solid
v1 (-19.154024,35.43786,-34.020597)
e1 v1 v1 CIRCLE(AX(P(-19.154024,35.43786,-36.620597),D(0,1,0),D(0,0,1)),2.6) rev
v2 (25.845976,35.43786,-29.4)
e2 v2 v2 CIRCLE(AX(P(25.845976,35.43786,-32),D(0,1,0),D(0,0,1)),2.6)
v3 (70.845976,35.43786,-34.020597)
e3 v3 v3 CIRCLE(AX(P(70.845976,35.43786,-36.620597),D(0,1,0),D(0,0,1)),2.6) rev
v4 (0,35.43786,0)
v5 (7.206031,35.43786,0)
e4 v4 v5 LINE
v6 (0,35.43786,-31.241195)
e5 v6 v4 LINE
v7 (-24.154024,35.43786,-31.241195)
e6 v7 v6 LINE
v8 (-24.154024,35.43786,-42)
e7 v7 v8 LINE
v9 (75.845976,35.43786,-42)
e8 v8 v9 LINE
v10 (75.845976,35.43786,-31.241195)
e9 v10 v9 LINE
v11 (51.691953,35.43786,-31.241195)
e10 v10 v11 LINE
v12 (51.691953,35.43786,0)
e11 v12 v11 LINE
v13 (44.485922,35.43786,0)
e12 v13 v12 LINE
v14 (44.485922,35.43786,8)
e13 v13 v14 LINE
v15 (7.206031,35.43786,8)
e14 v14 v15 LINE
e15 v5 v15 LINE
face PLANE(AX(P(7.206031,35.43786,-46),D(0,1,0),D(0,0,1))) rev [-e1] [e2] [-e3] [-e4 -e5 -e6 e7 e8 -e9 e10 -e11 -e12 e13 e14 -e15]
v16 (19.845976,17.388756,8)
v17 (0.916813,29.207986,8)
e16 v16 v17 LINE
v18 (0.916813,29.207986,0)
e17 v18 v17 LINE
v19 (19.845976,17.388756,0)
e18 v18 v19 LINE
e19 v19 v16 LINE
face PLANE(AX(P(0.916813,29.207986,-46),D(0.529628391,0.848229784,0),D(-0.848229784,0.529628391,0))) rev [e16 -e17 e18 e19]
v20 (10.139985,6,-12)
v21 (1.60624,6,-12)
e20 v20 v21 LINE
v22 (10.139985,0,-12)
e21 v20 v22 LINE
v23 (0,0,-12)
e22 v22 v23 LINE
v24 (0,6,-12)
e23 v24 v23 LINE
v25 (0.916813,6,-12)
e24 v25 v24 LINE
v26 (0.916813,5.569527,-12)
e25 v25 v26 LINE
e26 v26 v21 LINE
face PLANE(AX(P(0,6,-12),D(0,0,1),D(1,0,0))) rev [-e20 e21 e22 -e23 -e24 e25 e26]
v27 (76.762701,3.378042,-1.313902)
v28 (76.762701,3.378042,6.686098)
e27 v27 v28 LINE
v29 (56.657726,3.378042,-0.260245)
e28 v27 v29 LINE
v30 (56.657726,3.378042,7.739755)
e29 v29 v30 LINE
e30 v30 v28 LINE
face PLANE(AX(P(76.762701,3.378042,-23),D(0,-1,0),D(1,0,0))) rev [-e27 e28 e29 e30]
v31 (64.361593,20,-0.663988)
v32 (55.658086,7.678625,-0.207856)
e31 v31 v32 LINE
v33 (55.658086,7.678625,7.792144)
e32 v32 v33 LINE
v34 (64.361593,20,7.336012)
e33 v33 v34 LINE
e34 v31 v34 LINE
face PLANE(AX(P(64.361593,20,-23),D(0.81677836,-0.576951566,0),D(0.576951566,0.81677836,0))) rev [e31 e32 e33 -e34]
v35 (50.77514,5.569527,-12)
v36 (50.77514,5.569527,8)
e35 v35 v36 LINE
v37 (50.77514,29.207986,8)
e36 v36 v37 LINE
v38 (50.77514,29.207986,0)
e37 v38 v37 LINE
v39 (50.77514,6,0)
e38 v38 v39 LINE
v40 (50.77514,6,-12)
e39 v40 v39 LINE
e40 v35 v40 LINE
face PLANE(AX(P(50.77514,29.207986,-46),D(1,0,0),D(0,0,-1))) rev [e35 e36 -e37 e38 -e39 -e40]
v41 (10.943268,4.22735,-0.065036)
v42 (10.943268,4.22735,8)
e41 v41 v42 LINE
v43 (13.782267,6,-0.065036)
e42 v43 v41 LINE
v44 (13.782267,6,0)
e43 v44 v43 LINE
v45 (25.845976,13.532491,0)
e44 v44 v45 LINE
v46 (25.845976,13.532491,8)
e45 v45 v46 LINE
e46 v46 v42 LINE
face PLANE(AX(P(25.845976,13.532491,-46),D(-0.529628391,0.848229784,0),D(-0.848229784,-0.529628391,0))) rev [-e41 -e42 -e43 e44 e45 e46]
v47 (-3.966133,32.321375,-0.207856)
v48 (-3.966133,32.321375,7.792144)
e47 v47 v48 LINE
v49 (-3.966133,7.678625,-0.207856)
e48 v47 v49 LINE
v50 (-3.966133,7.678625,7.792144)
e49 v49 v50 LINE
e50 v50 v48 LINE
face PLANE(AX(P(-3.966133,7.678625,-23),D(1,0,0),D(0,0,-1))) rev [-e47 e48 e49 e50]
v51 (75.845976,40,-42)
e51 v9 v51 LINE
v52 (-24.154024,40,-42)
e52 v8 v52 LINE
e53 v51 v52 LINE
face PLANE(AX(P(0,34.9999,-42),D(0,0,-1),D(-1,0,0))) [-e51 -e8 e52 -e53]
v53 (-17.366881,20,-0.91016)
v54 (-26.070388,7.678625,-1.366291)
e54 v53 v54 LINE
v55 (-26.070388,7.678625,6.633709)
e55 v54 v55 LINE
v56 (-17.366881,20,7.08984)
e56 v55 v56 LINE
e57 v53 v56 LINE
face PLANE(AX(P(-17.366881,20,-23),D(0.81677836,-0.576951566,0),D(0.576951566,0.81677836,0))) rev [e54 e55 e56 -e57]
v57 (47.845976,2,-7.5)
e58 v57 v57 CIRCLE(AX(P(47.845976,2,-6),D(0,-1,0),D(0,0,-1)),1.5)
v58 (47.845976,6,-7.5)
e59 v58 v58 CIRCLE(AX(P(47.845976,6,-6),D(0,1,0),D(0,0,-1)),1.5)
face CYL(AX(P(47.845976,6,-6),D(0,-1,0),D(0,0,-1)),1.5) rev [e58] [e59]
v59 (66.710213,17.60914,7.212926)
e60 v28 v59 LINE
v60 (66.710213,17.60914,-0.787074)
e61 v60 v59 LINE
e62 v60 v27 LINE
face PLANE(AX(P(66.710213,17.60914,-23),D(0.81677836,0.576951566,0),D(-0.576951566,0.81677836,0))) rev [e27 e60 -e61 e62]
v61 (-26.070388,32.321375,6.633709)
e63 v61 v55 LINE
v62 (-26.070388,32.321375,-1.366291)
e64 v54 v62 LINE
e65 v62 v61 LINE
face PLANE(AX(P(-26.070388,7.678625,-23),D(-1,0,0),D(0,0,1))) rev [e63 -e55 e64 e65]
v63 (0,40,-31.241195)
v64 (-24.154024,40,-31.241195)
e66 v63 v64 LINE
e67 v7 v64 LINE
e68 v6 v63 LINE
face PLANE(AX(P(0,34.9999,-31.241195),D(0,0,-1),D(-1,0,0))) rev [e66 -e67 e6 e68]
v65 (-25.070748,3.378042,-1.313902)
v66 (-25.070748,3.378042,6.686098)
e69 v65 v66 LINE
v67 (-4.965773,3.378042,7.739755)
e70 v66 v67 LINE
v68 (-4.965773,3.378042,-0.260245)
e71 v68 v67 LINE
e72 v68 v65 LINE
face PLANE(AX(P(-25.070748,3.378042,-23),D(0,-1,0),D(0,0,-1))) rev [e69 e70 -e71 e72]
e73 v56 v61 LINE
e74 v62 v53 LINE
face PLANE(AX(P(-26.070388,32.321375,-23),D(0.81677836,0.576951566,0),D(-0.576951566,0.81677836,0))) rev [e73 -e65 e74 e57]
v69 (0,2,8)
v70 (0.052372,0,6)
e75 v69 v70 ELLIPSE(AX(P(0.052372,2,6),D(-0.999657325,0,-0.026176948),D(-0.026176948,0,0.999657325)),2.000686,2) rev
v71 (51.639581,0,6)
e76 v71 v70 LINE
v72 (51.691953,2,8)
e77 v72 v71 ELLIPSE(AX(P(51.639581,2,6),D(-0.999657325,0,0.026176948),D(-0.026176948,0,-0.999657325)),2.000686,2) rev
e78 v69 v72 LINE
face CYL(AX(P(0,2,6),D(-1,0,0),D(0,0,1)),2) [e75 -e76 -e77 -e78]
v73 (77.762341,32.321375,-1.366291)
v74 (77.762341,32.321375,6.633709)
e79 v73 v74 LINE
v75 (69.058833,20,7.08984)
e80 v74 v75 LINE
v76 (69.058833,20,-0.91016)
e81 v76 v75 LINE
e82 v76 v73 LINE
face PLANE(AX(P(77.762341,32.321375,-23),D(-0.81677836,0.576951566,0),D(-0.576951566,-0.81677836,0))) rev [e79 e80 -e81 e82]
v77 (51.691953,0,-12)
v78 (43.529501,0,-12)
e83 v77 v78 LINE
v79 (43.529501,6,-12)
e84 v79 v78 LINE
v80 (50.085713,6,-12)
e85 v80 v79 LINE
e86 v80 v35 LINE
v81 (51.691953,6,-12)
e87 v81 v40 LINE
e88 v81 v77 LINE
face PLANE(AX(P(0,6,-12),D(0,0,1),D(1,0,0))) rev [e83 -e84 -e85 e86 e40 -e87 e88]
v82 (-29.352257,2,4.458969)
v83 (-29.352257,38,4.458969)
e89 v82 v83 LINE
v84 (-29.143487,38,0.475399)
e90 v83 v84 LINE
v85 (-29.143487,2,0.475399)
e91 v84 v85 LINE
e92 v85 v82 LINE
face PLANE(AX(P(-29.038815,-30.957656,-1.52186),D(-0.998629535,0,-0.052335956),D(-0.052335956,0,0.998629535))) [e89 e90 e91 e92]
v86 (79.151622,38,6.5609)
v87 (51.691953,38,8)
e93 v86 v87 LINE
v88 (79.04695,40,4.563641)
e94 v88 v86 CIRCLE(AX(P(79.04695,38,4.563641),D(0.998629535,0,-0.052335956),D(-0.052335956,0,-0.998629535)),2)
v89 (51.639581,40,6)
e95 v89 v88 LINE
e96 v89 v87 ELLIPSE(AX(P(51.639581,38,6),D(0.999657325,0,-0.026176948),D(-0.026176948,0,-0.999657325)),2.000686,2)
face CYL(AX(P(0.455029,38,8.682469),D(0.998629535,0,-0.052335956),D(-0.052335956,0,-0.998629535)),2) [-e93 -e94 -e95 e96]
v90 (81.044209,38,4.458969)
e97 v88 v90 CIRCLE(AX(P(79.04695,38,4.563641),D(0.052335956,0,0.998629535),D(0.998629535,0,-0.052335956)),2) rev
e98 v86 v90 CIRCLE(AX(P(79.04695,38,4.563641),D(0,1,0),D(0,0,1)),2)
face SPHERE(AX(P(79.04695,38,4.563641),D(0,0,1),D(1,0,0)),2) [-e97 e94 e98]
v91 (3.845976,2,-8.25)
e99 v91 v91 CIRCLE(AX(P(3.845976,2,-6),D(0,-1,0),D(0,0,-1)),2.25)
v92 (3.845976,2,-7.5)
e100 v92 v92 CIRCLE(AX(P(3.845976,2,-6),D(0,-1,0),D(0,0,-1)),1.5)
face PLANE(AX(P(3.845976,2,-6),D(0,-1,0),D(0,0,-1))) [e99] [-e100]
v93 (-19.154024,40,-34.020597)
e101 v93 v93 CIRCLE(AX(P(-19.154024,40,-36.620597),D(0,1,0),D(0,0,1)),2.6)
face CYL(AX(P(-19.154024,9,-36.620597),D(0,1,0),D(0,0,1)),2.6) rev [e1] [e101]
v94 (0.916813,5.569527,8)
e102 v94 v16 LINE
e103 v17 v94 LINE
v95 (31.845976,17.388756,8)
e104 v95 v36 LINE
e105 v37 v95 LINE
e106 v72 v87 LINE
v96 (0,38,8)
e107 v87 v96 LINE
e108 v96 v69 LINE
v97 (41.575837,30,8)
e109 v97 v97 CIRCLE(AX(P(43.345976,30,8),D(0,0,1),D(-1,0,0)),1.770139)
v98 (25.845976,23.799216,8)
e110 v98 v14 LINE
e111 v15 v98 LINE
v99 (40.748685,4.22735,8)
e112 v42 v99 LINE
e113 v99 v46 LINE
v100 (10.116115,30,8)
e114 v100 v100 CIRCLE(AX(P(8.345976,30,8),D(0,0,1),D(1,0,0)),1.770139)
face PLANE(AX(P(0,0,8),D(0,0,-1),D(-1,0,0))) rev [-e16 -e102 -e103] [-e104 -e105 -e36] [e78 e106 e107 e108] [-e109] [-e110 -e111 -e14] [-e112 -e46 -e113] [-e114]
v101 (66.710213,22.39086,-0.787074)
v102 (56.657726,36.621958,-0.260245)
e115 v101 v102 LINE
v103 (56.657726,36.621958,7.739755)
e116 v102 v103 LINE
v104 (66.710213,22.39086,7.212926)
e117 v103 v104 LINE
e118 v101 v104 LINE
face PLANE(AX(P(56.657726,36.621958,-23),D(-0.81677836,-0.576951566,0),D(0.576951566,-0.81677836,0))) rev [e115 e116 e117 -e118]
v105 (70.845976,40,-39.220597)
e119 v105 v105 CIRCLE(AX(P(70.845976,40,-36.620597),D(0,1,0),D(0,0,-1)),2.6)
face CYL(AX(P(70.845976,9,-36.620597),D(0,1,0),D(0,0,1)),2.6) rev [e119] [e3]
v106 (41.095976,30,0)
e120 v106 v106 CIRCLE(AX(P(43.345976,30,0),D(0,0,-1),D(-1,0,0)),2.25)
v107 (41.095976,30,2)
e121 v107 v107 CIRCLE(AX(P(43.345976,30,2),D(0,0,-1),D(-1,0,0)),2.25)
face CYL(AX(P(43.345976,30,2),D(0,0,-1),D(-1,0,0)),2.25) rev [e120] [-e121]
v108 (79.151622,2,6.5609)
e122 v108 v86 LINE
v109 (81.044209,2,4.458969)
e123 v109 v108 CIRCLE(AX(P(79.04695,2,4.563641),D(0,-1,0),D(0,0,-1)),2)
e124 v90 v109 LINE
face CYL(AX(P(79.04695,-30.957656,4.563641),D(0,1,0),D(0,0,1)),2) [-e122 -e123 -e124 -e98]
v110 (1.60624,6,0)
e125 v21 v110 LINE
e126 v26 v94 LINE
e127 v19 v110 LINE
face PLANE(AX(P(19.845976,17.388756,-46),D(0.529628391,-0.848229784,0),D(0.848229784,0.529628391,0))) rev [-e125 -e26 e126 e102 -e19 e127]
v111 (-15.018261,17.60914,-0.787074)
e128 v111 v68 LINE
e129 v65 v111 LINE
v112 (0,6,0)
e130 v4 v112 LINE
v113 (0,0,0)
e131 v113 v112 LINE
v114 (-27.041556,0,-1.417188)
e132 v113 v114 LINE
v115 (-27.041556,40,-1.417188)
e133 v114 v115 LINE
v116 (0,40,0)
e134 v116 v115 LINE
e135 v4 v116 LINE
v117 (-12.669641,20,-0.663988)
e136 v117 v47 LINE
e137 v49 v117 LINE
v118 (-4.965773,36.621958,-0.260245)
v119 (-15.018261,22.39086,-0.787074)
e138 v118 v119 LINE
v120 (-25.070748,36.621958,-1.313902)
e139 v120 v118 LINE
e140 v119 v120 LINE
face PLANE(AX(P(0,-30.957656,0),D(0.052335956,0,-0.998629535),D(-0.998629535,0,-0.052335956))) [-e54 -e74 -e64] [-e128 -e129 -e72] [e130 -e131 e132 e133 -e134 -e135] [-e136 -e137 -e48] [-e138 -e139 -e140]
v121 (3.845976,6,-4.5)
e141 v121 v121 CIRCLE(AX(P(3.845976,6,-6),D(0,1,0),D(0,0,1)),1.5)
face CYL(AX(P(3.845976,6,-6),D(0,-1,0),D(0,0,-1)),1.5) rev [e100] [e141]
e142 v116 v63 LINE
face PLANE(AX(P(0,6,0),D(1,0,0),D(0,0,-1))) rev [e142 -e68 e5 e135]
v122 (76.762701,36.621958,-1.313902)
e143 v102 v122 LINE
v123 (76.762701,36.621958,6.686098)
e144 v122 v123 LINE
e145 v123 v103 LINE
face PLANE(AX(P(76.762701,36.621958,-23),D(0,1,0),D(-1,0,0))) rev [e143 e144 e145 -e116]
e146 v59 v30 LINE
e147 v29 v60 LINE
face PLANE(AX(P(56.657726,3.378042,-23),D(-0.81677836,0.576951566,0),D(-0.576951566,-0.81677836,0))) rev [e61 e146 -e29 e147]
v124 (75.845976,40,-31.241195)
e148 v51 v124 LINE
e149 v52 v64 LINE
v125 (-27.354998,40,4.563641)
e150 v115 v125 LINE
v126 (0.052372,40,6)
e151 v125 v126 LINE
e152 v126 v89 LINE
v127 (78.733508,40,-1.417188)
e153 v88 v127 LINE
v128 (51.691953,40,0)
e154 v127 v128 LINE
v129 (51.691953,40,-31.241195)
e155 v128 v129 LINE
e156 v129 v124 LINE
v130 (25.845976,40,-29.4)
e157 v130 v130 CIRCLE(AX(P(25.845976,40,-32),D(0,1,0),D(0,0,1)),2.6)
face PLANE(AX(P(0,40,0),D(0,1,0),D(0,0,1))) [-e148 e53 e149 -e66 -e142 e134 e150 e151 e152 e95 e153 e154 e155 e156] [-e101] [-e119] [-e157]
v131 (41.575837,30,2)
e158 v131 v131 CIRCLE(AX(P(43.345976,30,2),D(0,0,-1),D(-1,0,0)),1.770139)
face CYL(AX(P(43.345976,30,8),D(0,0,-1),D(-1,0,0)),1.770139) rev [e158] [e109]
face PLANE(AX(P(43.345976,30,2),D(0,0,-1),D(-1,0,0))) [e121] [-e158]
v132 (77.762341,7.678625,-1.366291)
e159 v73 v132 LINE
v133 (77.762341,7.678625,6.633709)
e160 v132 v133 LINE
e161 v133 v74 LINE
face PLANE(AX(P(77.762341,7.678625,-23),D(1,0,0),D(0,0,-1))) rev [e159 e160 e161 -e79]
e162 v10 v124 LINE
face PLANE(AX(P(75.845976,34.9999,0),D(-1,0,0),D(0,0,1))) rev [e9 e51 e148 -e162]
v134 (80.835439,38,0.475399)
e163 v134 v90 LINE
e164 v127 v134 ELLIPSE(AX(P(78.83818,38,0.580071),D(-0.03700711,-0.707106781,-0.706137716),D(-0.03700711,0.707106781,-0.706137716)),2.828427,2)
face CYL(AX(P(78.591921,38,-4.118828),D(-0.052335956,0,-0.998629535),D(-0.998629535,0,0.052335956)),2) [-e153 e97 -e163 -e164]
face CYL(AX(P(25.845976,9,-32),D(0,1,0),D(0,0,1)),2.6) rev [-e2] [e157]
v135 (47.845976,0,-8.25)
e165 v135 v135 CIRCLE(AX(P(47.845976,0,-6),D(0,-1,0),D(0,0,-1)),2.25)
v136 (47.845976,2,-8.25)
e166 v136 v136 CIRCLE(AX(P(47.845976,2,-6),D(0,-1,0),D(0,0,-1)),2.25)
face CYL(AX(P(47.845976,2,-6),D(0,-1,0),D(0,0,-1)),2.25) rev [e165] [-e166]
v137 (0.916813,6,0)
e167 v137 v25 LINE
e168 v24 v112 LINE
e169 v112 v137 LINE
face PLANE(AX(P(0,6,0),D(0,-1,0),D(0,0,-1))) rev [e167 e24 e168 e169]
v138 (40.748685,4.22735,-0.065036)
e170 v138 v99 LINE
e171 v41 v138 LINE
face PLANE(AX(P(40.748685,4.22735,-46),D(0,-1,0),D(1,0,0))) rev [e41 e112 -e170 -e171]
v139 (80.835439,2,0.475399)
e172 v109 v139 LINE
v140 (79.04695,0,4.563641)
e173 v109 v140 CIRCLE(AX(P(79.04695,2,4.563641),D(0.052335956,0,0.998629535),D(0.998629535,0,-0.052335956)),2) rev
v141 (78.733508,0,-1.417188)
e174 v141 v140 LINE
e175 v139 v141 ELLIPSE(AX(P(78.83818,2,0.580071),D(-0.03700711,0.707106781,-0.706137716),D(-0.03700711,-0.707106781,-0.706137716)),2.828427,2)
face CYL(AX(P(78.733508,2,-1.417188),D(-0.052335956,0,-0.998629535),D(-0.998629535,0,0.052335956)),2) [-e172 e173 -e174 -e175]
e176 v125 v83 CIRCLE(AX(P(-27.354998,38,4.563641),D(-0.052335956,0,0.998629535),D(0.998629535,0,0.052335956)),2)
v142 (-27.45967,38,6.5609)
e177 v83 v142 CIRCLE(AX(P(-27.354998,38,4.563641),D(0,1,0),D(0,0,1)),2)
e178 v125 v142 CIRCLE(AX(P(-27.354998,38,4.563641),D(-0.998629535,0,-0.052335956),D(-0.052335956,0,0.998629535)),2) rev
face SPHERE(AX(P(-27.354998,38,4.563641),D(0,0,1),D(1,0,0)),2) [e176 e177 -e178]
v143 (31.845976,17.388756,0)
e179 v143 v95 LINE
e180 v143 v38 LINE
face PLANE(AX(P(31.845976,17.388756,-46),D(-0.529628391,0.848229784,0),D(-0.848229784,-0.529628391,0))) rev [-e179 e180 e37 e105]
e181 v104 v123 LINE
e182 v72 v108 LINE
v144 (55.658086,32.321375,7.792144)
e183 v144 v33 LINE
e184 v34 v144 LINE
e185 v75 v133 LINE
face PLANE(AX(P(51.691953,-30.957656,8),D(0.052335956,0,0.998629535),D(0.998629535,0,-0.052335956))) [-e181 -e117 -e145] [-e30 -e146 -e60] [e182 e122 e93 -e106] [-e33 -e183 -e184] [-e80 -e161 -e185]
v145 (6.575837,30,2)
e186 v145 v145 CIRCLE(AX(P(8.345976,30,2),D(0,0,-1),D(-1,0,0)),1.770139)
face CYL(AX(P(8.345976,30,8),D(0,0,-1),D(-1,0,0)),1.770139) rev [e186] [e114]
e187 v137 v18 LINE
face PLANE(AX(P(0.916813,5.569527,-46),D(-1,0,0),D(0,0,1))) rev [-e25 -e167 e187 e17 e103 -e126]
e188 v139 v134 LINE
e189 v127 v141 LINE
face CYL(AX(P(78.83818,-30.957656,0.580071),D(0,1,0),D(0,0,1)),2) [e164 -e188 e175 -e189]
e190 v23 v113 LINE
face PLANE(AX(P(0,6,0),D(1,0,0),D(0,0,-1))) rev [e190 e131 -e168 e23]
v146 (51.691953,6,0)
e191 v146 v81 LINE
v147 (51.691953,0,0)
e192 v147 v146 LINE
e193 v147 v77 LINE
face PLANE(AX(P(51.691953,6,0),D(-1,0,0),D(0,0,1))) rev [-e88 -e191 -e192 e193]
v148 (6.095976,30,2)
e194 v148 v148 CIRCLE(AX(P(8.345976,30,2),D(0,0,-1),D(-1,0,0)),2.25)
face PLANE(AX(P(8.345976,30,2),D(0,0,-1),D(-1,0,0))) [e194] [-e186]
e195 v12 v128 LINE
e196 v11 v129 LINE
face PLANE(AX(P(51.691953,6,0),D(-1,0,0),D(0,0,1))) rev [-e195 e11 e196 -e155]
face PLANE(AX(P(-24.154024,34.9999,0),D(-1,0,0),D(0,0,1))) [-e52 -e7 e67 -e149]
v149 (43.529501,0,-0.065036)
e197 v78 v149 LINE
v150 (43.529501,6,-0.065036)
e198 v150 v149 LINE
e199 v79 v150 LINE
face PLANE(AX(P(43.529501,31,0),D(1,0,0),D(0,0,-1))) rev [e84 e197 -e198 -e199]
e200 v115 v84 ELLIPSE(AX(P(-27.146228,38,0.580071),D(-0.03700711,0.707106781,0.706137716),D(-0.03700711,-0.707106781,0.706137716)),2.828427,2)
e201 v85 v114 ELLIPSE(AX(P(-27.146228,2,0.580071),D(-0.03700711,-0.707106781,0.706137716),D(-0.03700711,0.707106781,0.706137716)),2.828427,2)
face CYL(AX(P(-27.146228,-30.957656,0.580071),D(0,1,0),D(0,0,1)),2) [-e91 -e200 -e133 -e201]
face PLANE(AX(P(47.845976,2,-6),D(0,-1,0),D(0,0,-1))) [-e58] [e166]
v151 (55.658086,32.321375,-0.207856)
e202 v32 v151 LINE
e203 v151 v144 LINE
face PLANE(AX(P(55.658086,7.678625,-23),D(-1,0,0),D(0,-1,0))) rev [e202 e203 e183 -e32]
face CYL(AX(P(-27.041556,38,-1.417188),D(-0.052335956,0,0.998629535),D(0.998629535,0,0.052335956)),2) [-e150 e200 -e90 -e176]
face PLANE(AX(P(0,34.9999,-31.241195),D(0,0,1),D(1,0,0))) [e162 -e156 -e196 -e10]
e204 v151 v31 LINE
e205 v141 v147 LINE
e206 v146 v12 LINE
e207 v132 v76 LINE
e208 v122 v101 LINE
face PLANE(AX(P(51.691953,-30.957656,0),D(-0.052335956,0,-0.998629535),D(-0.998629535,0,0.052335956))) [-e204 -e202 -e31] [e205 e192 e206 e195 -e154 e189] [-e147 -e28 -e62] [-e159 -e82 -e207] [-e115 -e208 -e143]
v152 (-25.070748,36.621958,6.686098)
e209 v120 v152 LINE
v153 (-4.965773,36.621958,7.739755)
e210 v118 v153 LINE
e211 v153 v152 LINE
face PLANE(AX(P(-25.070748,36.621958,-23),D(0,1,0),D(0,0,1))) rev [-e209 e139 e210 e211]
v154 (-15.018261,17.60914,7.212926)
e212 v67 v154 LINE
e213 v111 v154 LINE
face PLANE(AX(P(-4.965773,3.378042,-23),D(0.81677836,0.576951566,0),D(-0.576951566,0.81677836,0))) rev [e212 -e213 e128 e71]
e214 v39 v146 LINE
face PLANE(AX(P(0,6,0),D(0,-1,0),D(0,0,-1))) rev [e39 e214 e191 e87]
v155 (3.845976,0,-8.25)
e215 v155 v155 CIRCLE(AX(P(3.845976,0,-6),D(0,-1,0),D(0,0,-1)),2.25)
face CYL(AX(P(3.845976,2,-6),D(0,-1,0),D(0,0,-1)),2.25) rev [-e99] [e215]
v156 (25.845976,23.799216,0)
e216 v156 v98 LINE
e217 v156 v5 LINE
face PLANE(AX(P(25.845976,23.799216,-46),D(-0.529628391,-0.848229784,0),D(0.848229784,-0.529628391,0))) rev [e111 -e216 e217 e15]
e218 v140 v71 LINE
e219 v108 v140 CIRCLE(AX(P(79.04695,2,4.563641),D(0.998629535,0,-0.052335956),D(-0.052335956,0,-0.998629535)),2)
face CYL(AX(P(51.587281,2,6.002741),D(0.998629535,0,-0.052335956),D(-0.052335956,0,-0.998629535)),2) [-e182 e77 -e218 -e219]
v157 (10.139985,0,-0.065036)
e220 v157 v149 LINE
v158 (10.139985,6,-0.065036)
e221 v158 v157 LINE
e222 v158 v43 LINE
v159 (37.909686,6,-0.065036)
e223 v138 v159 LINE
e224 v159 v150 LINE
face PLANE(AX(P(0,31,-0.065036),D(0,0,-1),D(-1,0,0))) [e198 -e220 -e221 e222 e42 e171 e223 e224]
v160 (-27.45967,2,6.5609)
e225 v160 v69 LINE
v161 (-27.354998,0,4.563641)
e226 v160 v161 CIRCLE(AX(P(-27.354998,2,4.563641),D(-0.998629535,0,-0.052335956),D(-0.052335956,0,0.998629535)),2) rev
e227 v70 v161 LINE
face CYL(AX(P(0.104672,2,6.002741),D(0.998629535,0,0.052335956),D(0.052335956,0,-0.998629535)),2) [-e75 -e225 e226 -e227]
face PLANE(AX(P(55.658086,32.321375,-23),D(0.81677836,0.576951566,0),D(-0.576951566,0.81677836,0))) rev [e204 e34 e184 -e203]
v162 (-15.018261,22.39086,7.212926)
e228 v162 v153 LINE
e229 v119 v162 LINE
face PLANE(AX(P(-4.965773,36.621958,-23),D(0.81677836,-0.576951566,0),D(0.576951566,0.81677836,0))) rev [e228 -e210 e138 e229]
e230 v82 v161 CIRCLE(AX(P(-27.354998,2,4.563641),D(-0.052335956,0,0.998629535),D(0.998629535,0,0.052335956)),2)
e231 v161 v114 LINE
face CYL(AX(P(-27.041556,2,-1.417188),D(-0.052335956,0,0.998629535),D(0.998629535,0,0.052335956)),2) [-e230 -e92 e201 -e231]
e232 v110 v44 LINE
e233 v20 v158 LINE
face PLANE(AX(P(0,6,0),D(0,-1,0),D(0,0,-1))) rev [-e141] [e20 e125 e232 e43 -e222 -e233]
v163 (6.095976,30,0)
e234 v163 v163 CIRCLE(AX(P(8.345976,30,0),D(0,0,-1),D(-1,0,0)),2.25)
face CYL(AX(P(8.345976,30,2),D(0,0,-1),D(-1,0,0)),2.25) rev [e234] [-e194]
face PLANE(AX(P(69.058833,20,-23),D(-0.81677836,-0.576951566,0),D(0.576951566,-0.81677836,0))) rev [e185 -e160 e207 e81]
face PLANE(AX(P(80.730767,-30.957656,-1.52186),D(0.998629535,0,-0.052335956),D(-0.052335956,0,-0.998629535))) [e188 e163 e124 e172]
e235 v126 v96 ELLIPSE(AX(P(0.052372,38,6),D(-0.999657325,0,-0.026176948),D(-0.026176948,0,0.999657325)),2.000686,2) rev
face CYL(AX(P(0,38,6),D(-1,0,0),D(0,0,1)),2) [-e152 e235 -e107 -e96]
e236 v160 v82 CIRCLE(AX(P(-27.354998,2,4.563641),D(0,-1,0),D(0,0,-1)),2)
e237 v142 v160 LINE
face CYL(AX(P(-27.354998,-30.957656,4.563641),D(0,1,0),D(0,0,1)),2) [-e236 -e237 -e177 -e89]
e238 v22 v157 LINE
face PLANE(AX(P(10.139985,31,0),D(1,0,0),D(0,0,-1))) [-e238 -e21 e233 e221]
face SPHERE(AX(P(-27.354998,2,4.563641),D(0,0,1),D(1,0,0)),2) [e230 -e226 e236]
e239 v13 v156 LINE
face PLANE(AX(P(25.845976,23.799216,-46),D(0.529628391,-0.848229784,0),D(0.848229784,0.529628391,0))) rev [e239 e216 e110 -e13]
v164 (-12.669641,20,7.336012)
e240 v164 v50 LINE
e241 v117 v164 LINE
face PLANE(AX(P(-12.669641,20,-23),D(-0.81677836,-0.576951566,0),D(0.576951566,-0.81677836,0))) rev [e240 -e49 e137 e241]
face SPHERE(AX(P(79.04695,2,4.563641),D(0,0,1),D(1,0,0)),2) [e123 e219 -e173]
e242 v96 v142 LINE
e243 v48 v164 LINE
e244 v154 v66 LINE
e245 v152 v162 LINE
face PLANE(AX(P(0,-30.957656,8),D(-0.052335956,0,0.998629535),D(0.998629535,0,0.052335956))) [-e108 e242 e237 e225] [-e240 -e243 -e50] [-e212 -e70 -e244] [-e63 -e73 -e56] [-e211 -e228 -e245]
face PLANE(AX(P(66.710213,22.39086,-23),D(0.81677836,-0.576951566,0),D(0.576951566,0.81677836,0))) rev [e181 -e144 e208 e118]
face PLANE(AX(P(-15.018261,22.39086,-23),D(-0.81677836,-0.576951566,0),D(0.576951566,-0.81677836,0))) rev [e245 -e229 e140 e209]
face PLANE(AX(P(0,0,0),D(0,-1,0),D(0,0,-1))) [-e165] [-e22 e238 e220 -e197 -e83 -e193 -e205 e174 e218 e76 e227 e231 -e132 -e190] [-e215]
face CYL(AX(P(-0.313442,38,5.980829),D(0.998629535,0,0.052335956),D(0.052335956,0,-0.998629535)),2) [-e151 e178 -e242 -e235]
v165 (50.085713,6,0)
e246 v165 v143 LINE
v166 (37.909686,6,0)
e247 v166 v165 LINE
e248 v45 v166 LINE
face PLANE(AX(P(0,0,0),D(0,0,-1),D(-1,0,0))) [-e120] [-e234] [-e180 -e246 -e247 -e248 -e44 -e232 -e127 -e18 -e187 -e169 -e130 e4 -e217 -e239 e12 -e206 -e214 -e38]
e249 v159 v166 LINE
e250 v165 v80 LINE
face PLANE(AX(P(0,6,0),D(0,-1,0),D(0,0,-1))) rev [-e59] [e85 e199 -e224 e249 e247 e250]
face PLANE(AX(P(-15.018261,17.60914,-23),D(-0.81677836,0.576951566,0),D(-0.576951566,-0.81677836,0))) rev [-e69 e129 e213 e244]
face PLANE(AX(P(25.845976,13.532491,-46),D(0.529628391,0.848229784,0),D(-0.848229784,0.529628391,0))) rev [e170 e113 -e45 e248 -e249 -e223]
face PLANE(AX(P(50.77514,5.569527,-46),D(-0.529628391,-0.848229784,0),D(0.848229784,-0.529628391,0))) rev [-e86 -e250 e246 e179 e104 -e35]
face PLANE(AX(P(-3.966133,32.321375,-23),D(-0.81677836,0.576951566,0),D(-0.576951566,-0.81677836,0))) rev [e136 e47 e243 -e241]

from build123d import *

# Parameters (mm, degrees)
SKETCH1_W                = 51.691952551
SKETCH1_H                = 12
SKETCH1_R                = 1.5
BOSS_EXTRUDE1_DEPTH      = 6
SKETCH2_W                = 51.691952551
SKETCH2_H                = 35
SKETCH2_R                = 1.770138793
BOSS_EXTRUDE2_DEPTH      = 8
SKETCH3_R                = 2.25
CUT_EXTRUDE1_DEPTH       = 2
SKETCH4_R                = 2.25
CUT_EXTRUDE2_DEPTH       = 2
BOSS_EXTRUDE3_DEPTH      = 5
BOSS_EXTRUDE3_DEPTH_BACK = 0.0001
SKETCH5_W                = 24.154023724
SKETCH5_H                = 10.75880516
SKETCH5_W_2              = 24.154023725
CUT_EXTRUDE5_DEPTH       = 54
SKETCH15_W               = 33.389515724
SKETCH15_H               = 11.934964058
SKETCH15_W_2             = 15.051094337
SKETCH15_H_2             = 8.223566484
CUT_EXTRUDE6_DEPTH       = 31
BOSS_EXTRUDE6_REACH      = 97.481
CUT_EXTRUDE8_DEPTH       = 31
FILLET1_R                = 2
SKETCH23_R               = 2.6
CUT_EXTRUDE9_DEPTH       = 31
SKETCH25_W               = 109.4362768
SKETCH25_H               = 39.504770738
SKETCH25_W_2             = 51.691952551
SKETCH25_H_2             = 2.495229262
CUT_EXTRUDE10_DEPTH      = 0.437959608


with BuildPart() as part:
    # Sketch1 → Boss-Extrude1 (new body)
    with BuildSketch(Plane(origin=(0, 0, 0), x_dir=(1, 0, 0), z_dir=(0, 1, 0))):
        with Locations((25.845976275, 6)):
            Rectangle(SKETCH1_W, SKETCH1_H)
        with Locations(Location((3.845976276, 6, 0), (0, 0, 270))):
            Circle(SKETCH1_R, mode=Mode.SUBTRACT)
        with Locations(Location((47.845976276, 6, 0), (0, 0, 90))):
            Circle(SKETCH1_R, mode=Mode.SUBTRACT)
    extrude(amount=BOSS_EXTRUDE1_DEPTH)

    # Sketch2 → Boss-Extrude2 (add)
    with BuildSketch(Plane.XY):
        with Locations((25.845976275, 17.5)):
            Rectangle(SKETCH2_W, SKETCH2_H)
        with Locations((8.345976276, 30)):
            Circle(SKETCH2_R, mode=Mode.SUBTRACT)
        with Locations(Location((43.345976276, 30, 0), (0, 0, 180))):
            Circle(SKETCH2_R, mode=Mode.SUBTRACT)
    extrude(amount=BOSS_EXTRUDE2_DEPTH)

    # Sketch3 → Cut-Extrude1 (cut)
    with BuildSketch(Plane.XZ):
        with Locations(Location((47.845976276, -6, 0), (0, 0, 270))):
            Circle(SKETCH3_R)
        with Locations(Location((3.845976276, -6, 0), (0, 0, 270))):
            Circle(SKETCH3_R)
    extrude(amount=-CUT_EXTRUDE1_DEPTH, mode=Mode.SUBTRACT)

    # Sketch4 → Cut-Extrude2 (cut)
    with BuildSketch(Plane(origin=(0, 0, 0), x_dir=(-1, 0, 0), z_dir=(0, 0, -1))):
        with Locations((-43.345976276, 30)):
            Circle(SKETCH4_R)
        with Locations((-8.345976276, 30)):
            Circle(SKETCH4_R)
    extrude(amount=-CUT_EXTRUDE2_DEPTH, mode=Mode.SUBTRACT)

    # Sketch5 → Boss-Extrude3 (add, two sides: drawn at the far end of the back side and taken through both)
    # profile 1 of 3: a face of its own
    with BuildSketch(Plane(origin=(0, 35, 0), x_dir=(1, 0, 0), z_dir=(0, 1, 0)).offset(-BOSS_EXTRUDE3_DEPTH_BACK)):
        Polygon((0, -8), (25.845976276, -8), (51.691952551, -8), (51.691952551, 31.24119484), (51.691952551, 42), (0, 42), (0, 31.24119484), align=None)
        with BuildLine():
            ThreePointArc((28.345976276, 32), (27.613743229, 30.232233047), (25.845976276, 29.5))
            ThreePointArc((25.845976276, 29.5), (24.078209323, 33.767766953), (28.345976276, 32))
        make_face(mode=Mode.SUBTRACT)
    # profile 2 of 3: a face of its own
    with BuildSketch(Plane(origin=(0, 35, 0), x_dir=(1, 0, 0), z_dir=(0, 1, 0)).offset(-BOSS_EXTRUDE3_DEPTH_BACK)):
        with Locations((-12.077011862, 36.62059742)):
            Rectangle(SKETCH5_W, SKETCH5_H)
    # profile 3 of 3: a face of its own
    with BuildSketch(Plane(origin=(0, 35, 0), x_dir=(1, 0, 0), z_dir=(0, 1, 0)).offset(-BOSS_EXTRUDE3_DEPTH_BACK)):
        with Locations((63.768964414, 36.62059742)):
            Rectangle(SKETCH5_W_2, SKETCH5_H)
    extrude(amount=BOSS_EXTRUDE3_DEPTH + BOSS_EXTRUDE3_DEPTH_BACK)

    # Sketch14 → Cut-Extrude5 (cut)
    with BuildSketch(Plane.XY.offset(8)):
        Polygon((50.775139706, 29.207985595), (50.775139706, 5.569526874), (31.845976276, 17.388756234), align=None)
        Polygon((19.845976276, 17.388756234), (0.916812846, 5.569526874), (0.916812846, 29.207985595), align=None)
        Polygon((25.845976276, 23.799215747), (44.485921829, 35.437859608), (7.206030723, 35.437859608), align=None)
        Polygon((25.845976276, 13.532490719), (10.943267581, 4.227349855), (40.74868497, 4.227349855), align=None)
    extrude(amount=-CUT_EXTRUDE5_DEPTH, mode=Mode.SUBTRACT)

    # Sketch15 → Cut-Extrude6 (cut)
    with BuildSketch(Plane.XZ):
        with Locations((26.834743107, -6.032517971)):
            Rectangle(SKETCH15_W, SKETCH15_H)
        with Locations((26.283455375, -16.111783242)):
            Rectangle(SKETCH15_W_2, SKETCH15_H_2)
    extrude(amount=-CUT_EXTRUDE6_DEPTH, mode=Mode.SUBTRACT)

    # Boss-Extrude6: up to this face of the body (flat: up to its plane)
    boss_extrude6_end = Plane(part.part.faces().sort_by_distance((25.193104525, 0, 0.873444785))[0])
    # Sketch20 → Boss-Extrude6 (add, up to the picked face)
    with BuildSketch(Plane(origin=(0, 40, 0), x_dir=(1, 0, 0), z_dir=(0, 1, 0)), mode=Mode.PRIVATE) as boss_extrude6_sk1:
        Polygon((0, -8), (-29.456928706, -6.456227782), (-29.038814853, 1.521859799), (0, 0), align=None)
    boss_extrude6_tool1 = split(extrude(boss_extrude6_sk1.sketch, amount=-BOSS_EXTRUDE6_REACH, mode=Mode.PRIVATE), bisect_by=boss_extrude6_end, keep=Keep.BOTH, mode=Mode.PRIVATE)
    # Sketch20 → Boss-Extrude6 (add, up to the picked face)
    with BuildSketch(Plane(origin=(0, 40, 0), x_dir=(1, 0, 0), z_dir=(0, 1, 0)), mode=Mode.PRIVATE) as boss_extrude6_sk2:
        Polygon((51.691952551, 0), (51.691952551, -8), (81.148881258, -6.456227782), (80.730767404, 1.521859799), align=None)
    boss_extrude6_tool2 = split(extrude(boss_extrude6_sk2.sketch, amount=-BOSS_EXTRUDE6_REACH, mode=Mode.PRIVATE), bisect_by=boss_extrude6_end, keep=Keep.BOTH, mode=Mode.PRIVATE)
    add(boss_extrude6_tool1.solids().sort_by(Axis((-14.624185, 40, 3.243109), (0, -1, 0)))[0])
    add(boss_extrude6_tool2.solids().sort_by(Axis((66.316137, 40, 3.243109), (0, -1, 0)))[0])

    # Sketch21 → Cut-Extrude8 (cut)
    with BuildSketch(Plane.XY.offset(8)):
        Polygon((-3.96613305, 7.67862469), (-3.96613305, 32.32137531), (-12.669640792, 20), align=None)
        Polygon((-4.965773008, 36.621958218), (-15.018260668, 22.39086003), (-25.070748328, 36.621958218), align=None)
        Polygon((-15.018260668, 17.60913997), (-25.070748328, 3.378041782), (-4.965773008, 3.378041782), align=None)
        Polygon((-26.070388286, 32.32137531), (-17.366880544, 20), (-26.070388286, 7.67862469), align=None)
        Polygon((69.058833096, 20), (77.762340838, 7.67862469), (77.762340838, 32.32137531), align=None)
        Polygon((76.762700879, 3.378041782), (56.657725559, 3.378041782), (66.710213219, 17.60913997), align=None)
        Polygon((76.762700879, 36.621958218), (56.657725559, 36.621958218), (66.710213219, 22.39086003), align=None)
        Polygon((64.361593343, 20), (55.658085601, 7.67862469), (55.658085601, 32.32137531), align=None)
    extrude(amount=-CUT_EXTRUDE8_DEPTH, mode=Mode.SUBTRACT)

    # Fillet1
    # the kernel refuses this fillet: 2 mm, written as the material it takes off along each edge
    with BuildSketch(Plane(origin=(-27.354997724, 38, 4.563640625), x_dir=(-0.9986295347545743, 0, -0.05233595624293728), z_dir=(0, 1, 0))) as fillet1_piece_1_section:
        Polygon((0, 0), (FILLET1_R, 0), (FILLET1_R, FILLET1_R), (0, FILLET1_R), align=None)
    fillet1_piece_1 = extrude(amount=FILLET1_R, mode=Mode.PRIVATE)
    fillet1_piece_1 = fillet1_piece_1 - Plane(origin=(-27.354997724, 38, 4.563640625), x_dir=(0.7431448254773897, 0, -0.6691306063588632), z_dir=(0, 1, 0)) * Sphere(FILLET1_R, mode=Mode.PRIVATE)
    add(fillet1_piece_1, mode=Mode.SUBTRACT)
    with BuildSketch(Plane(origin=(-27.354997724, 2, 4.563640625), x_dir=(-0.9986295347545743, 0, -0.05233595624293728), z_dir=(0, -1, 0))) as fillet1_piece_2_section:
        Polygon((0, 0), (FILLET1_R, 0), (FILLET1_R, -FILLET1_R), (0, -FILLET1_R), align=None)
    fillet1_piece_2 = extrude(amount=FILLET1_R, mode=Mode.PRIVATE)
    fillet1_piece_2 = fillet1_piece_2 - Plane(origin=(-27.354997724, 2, 4.563640625), x_dir=(0.7431448254773897, 0, -0.6691306063588632), z_dir=(0, -1, 0)) * Sphere(FILLET1_R, mode=Mode.PRIVATE)
    add(fillet1_piece_2, mode=Mode.SUBTRACT)
    with BuildSketch(Plane(origin=(79.046950276, 38, 4.563640625), x_dir=(0, 1, 0), z_dir=(0.052335956242936896, 0, 0.9986295347545743))) as fillet1_piece_3_section:
        Polygon((0, 0), (FILLET1_R, 0), (FILLET1_R, -FILLET1_R), (0, -FILLET1_R), align=None)
    fillet1_piece_3 = extrude(amount=FILLET1_R, mode=Mode.PRIVATE)
    fillet1_piece_3 = fillet1_piece_3 - Plane(origin=(79.046950276, 38, 4.563640625), x_dir=(-0.7061377159181265, -0.7071067811865475, 0.03700710955926369), z_dir=(0.052335956242936896, 0, 0.9986295347545743)) * Sphere(FILLET1_R, mode=Mode.PRIVATE)
    add(fillet1_piece_3, mode=Mode.SUBTRACT)
    with BuildSketch(Plane(origin=(79.046950276, 2, 4.563640625), x_dir=(0.9986295347545743, 0, -0.05233595624293772), z_dir=(0.052335956242936896, 0, 0.9986295347545743))) as fillet1_piece_4_section:
        Polygon((0, 0), (FILLET1_R, 0), (FILLET1_R, -FILLET1_R), (0, -FILLET1_R), align=None)
    fillet1_piece_4 = extrude(amount=FILLET1_R, mode=Mode.PRIVATE)
    fillet1_piece_4 = fillet1_piece_4 - Plane(origin=(79.046950276, 2, 4.563640625), x_dir=(-0.7061377159181265, 0.7071067811865475, 0.03700710955926369), z_dir=(0.052335956242936896, 0, 0.9986295347545743)) * Sphere(FILLET1_R, mode=Mode.PRIVATE)
    add(fillet1_piece_4, mode=Mode.SUBTRACT)
    with BuildSketch(Plane(origin=(-29.352256794, 40, 4.458968713), x_dir=(0.9986295347545742, 0, 0.052335956242937264), z_dir=(0.05233595624293728, 0, -0.9986295347545743)), Plane(origin=(81.044209345, 0, 4.458968713), x_dir=(-0.9986295347545742, 1.7763568394002568e-15, 0.052335956242937715), z_dir=(-0.05233595624293772, 0, -0.9986295347545743))) as fillet1_piece_5:
        with BuildLine():
            CenterArc((FILLET1_R, FILLET1_R), FILLET1_R, 180, 90)
            Line((0, FILLET1_R), (0, 0))
            Line((0, 0), (FILLET1_R, 0))
        make_face()
    extrude(amount=10.989036278, mode=Mode.SUBTRACT)
    with BuildSketch(Plane(origin=(4.993147674, 40, 8.261679781), x_dir=(0.05233595624293691, 0, -0.9986295347545743), z_dir=(-0.9986295347545743, 0, -0.05233595624293691)), Plane(origin=(46.698804878, 0, 8.261679781), x_dir=(-0.052335956242936896, 0, -0.9986295347545743), z_dir=(0.9986295347545743, 0, -0.052335956242936896))) as fillet1_piece_6:
        with BuildLine():
            CenterArc((FILLET1_R, FILLET1_R), FILLET1_R, 180, 90)
            Line((0, FILLET1_R), (0, 0))
            Line((0, 0), (FILLET1_R, 0))
        make_face()
    extrude(amount=32.497353804, mode=Mode.SUBTRACT)
    with BuildSketch(Plane(origin=(-29.038814853, 45, -1.521859799), x_dir=(0.9986295347545744, 0, 0.05233595624293688), z_dir=(0, -1, 0))) as fillet1_piece_7:
        with BuildLine():
            CenterArc((FILLET1_R, FILLET1_R), FILLET1_R, 180, 90)
            Line((0, FILLET1_R), (0, 0))
            Line((0, 0), (FILLET1_R, 0))
        make_face()
    extrude(amount=50, mode=Mode.SUBTRACT)
    with BuildSketch(Plane(origin=(-29.352256794, 0, 4.458968713), x_dir=(0.9986295347545744, 0, 0.05233595624293728), z_dir=(0.05233595624293728, 0, -0.9986295347545743)), Plane(origin=(81.044209345, 40, 4.458968713), x_dir=(-0.9986295347545742, 0, 0.052335956242937715), z_dir=(-0.05233595624293772, 0, -0.9986295347545743))) as fillet1_piece_8:
        with BuildLine():
            CenterArc((FILLET1_R, -FILLET1_R), FILLET1_R, 90, 90)
            Line((0, -FILLET1_R), (0, 0))
            Line((0, 0), (FILLET1_R, 0))
        make_face()
    extrude(amount=10.989036278, mode=Mode.SUBTRACT)
    with BuildSketch(Plane(origin=(-29.456928706, 38, 6.456227782), x_dir=(0.0523359562429366, 0, -0.9986295347545744), z_dir=(0, -1, 0))) as fillet1_piece_9:
        with BuildLine():
            CenterArc((FILLET1_R, FILLET1_R), FILLET1_R, 180, 90)
            Line((0, FILLET1_R), (0, 0))
            Line((0, 0), (FILLET1_R, 0))
        make_face()
    extrude(amount=36, mode=Mode.SUBTRACT)
    with BuildSketch(Plane(origin=(4.993147674, 0, 8.261679781), x_dir=(0.05233595624293691, 0, -0.9986295347545743), z_dir=(-0.9986295347545743, 0, -0.05233595624293691)), Plane(origin=(46.698804878, 40, 8.261679781), x_dir=(-0.052335956242936896, 0, -0.9986295347545743), z_dir=(0.9986295347545743, 0, -0.052335956242936896))) as fillet1_piece_10:
        with BuildLine():
            CenterArc((FILLET1_R, -FILLET1_R), FILLET1_R, 90, 90)
            Line((0, -FILLET1_R), (0, 0))
            Line((0, 0), (FILLET1_R, 0))
        make_face()
    extrude(amount=32.497353804, mode=Mode.SUBTRACT)
    with BuildSketch(Plane(origin=(-5, 0, 8), x_dir=(0, 0, -1), z_dir=(1, 0, 0)), Plane(origin=(56.691952551, 40, 8), x_dir=(0, 0, -1), z_dir=(-1, 0, 0))) as fillet1_piece_11:
        with BuildLine():
            CenterArc((FILLET1_R, FILLET1_R), FILLET1_R, 180, 90)
            Line((0, FILLET1_R), (0, 0))
            Line((0, 0), (FILLET1_R, 0))
        make_face()
    extrude(amount=61.691952551, mode=Mode.SUBTRACT)
    with BuildSketch(Plane(origin=(81.148881258, 38, 6.456227782), x_dir=(-0.05233595624293482, 0, -0.9986295347545744), z_dir=(0, -1, 0))) as fillet1_piece_12:
        with BuildLine():
            CenterArc((FILLET1_R, -FILLET1_R), FILLET1_R, 90, 90)
            Line((0, -FILLET1_R), (0, 0))
            Line((0, 0), (FILLET1_R, 0))
        make_face()
    extrude(amount=36, mode=Mode.SUBTRACT)
    with BuildSketch(Plane(origin=(80.730767404, 45, -1.521859799), x_dir=(-0.9986295347545743, 0, 0.052335956242936604), z_dir=(0, -1, 0))) as fillet1_piece_13:
        with BuildLine():
            CenterArc((FILLET1_R, -FILLET1_R), FILLET1_R, 90, 90)
            Line((0, -FILLET1_R), (0, 0))
            Line((0, 0), (FILLET1_R, 0))
        make_face()
    extrude(amount=50, mode=Mode.SUBTRACT)

    # Sketch23 → Cut-Extrude9 (cut)
    with BuildSketch(Plane(origin=(0, 40, 0), x_dir=(1, 0, 0), z_dir=(0, 1, 0))):
        with Locations(Location((-19.154023724, 36.62059742, 0), (0, 0, 270))):
            Circle(SKETCH23_R)
        with Locations(Location((25.845976276, 32, 0), (0, 0, 270))):
            Circle(SKETCH23_R)
        with Locations(Location((70.845976276, 36.62059742, 0), (0, 0, 270))):
            Circle(SKETCH23_R)
    extrude(amount=-CUT_EXTRUDE9_DEPTH, mode=Mode.SUBTRACT)

    # Sketch25 → Cut-Extrude10 (cut)
    with BuildSketch(Plane.XZ.offset(-34.9999)):
        with Locations((30.564114676, -22.247614631)):
            Rectangle(SKETCH25_W, SKETCH25_H)
        with Locations((25.845976275, -1.247614631)):
            Rectangle(SKETCH25_W_2, SKETCH25_H_2)
    extrude(amount=-CUT_EXTRUDE10_DEPTH, mode=Mode.SUBTRACT)


solid = part.part
